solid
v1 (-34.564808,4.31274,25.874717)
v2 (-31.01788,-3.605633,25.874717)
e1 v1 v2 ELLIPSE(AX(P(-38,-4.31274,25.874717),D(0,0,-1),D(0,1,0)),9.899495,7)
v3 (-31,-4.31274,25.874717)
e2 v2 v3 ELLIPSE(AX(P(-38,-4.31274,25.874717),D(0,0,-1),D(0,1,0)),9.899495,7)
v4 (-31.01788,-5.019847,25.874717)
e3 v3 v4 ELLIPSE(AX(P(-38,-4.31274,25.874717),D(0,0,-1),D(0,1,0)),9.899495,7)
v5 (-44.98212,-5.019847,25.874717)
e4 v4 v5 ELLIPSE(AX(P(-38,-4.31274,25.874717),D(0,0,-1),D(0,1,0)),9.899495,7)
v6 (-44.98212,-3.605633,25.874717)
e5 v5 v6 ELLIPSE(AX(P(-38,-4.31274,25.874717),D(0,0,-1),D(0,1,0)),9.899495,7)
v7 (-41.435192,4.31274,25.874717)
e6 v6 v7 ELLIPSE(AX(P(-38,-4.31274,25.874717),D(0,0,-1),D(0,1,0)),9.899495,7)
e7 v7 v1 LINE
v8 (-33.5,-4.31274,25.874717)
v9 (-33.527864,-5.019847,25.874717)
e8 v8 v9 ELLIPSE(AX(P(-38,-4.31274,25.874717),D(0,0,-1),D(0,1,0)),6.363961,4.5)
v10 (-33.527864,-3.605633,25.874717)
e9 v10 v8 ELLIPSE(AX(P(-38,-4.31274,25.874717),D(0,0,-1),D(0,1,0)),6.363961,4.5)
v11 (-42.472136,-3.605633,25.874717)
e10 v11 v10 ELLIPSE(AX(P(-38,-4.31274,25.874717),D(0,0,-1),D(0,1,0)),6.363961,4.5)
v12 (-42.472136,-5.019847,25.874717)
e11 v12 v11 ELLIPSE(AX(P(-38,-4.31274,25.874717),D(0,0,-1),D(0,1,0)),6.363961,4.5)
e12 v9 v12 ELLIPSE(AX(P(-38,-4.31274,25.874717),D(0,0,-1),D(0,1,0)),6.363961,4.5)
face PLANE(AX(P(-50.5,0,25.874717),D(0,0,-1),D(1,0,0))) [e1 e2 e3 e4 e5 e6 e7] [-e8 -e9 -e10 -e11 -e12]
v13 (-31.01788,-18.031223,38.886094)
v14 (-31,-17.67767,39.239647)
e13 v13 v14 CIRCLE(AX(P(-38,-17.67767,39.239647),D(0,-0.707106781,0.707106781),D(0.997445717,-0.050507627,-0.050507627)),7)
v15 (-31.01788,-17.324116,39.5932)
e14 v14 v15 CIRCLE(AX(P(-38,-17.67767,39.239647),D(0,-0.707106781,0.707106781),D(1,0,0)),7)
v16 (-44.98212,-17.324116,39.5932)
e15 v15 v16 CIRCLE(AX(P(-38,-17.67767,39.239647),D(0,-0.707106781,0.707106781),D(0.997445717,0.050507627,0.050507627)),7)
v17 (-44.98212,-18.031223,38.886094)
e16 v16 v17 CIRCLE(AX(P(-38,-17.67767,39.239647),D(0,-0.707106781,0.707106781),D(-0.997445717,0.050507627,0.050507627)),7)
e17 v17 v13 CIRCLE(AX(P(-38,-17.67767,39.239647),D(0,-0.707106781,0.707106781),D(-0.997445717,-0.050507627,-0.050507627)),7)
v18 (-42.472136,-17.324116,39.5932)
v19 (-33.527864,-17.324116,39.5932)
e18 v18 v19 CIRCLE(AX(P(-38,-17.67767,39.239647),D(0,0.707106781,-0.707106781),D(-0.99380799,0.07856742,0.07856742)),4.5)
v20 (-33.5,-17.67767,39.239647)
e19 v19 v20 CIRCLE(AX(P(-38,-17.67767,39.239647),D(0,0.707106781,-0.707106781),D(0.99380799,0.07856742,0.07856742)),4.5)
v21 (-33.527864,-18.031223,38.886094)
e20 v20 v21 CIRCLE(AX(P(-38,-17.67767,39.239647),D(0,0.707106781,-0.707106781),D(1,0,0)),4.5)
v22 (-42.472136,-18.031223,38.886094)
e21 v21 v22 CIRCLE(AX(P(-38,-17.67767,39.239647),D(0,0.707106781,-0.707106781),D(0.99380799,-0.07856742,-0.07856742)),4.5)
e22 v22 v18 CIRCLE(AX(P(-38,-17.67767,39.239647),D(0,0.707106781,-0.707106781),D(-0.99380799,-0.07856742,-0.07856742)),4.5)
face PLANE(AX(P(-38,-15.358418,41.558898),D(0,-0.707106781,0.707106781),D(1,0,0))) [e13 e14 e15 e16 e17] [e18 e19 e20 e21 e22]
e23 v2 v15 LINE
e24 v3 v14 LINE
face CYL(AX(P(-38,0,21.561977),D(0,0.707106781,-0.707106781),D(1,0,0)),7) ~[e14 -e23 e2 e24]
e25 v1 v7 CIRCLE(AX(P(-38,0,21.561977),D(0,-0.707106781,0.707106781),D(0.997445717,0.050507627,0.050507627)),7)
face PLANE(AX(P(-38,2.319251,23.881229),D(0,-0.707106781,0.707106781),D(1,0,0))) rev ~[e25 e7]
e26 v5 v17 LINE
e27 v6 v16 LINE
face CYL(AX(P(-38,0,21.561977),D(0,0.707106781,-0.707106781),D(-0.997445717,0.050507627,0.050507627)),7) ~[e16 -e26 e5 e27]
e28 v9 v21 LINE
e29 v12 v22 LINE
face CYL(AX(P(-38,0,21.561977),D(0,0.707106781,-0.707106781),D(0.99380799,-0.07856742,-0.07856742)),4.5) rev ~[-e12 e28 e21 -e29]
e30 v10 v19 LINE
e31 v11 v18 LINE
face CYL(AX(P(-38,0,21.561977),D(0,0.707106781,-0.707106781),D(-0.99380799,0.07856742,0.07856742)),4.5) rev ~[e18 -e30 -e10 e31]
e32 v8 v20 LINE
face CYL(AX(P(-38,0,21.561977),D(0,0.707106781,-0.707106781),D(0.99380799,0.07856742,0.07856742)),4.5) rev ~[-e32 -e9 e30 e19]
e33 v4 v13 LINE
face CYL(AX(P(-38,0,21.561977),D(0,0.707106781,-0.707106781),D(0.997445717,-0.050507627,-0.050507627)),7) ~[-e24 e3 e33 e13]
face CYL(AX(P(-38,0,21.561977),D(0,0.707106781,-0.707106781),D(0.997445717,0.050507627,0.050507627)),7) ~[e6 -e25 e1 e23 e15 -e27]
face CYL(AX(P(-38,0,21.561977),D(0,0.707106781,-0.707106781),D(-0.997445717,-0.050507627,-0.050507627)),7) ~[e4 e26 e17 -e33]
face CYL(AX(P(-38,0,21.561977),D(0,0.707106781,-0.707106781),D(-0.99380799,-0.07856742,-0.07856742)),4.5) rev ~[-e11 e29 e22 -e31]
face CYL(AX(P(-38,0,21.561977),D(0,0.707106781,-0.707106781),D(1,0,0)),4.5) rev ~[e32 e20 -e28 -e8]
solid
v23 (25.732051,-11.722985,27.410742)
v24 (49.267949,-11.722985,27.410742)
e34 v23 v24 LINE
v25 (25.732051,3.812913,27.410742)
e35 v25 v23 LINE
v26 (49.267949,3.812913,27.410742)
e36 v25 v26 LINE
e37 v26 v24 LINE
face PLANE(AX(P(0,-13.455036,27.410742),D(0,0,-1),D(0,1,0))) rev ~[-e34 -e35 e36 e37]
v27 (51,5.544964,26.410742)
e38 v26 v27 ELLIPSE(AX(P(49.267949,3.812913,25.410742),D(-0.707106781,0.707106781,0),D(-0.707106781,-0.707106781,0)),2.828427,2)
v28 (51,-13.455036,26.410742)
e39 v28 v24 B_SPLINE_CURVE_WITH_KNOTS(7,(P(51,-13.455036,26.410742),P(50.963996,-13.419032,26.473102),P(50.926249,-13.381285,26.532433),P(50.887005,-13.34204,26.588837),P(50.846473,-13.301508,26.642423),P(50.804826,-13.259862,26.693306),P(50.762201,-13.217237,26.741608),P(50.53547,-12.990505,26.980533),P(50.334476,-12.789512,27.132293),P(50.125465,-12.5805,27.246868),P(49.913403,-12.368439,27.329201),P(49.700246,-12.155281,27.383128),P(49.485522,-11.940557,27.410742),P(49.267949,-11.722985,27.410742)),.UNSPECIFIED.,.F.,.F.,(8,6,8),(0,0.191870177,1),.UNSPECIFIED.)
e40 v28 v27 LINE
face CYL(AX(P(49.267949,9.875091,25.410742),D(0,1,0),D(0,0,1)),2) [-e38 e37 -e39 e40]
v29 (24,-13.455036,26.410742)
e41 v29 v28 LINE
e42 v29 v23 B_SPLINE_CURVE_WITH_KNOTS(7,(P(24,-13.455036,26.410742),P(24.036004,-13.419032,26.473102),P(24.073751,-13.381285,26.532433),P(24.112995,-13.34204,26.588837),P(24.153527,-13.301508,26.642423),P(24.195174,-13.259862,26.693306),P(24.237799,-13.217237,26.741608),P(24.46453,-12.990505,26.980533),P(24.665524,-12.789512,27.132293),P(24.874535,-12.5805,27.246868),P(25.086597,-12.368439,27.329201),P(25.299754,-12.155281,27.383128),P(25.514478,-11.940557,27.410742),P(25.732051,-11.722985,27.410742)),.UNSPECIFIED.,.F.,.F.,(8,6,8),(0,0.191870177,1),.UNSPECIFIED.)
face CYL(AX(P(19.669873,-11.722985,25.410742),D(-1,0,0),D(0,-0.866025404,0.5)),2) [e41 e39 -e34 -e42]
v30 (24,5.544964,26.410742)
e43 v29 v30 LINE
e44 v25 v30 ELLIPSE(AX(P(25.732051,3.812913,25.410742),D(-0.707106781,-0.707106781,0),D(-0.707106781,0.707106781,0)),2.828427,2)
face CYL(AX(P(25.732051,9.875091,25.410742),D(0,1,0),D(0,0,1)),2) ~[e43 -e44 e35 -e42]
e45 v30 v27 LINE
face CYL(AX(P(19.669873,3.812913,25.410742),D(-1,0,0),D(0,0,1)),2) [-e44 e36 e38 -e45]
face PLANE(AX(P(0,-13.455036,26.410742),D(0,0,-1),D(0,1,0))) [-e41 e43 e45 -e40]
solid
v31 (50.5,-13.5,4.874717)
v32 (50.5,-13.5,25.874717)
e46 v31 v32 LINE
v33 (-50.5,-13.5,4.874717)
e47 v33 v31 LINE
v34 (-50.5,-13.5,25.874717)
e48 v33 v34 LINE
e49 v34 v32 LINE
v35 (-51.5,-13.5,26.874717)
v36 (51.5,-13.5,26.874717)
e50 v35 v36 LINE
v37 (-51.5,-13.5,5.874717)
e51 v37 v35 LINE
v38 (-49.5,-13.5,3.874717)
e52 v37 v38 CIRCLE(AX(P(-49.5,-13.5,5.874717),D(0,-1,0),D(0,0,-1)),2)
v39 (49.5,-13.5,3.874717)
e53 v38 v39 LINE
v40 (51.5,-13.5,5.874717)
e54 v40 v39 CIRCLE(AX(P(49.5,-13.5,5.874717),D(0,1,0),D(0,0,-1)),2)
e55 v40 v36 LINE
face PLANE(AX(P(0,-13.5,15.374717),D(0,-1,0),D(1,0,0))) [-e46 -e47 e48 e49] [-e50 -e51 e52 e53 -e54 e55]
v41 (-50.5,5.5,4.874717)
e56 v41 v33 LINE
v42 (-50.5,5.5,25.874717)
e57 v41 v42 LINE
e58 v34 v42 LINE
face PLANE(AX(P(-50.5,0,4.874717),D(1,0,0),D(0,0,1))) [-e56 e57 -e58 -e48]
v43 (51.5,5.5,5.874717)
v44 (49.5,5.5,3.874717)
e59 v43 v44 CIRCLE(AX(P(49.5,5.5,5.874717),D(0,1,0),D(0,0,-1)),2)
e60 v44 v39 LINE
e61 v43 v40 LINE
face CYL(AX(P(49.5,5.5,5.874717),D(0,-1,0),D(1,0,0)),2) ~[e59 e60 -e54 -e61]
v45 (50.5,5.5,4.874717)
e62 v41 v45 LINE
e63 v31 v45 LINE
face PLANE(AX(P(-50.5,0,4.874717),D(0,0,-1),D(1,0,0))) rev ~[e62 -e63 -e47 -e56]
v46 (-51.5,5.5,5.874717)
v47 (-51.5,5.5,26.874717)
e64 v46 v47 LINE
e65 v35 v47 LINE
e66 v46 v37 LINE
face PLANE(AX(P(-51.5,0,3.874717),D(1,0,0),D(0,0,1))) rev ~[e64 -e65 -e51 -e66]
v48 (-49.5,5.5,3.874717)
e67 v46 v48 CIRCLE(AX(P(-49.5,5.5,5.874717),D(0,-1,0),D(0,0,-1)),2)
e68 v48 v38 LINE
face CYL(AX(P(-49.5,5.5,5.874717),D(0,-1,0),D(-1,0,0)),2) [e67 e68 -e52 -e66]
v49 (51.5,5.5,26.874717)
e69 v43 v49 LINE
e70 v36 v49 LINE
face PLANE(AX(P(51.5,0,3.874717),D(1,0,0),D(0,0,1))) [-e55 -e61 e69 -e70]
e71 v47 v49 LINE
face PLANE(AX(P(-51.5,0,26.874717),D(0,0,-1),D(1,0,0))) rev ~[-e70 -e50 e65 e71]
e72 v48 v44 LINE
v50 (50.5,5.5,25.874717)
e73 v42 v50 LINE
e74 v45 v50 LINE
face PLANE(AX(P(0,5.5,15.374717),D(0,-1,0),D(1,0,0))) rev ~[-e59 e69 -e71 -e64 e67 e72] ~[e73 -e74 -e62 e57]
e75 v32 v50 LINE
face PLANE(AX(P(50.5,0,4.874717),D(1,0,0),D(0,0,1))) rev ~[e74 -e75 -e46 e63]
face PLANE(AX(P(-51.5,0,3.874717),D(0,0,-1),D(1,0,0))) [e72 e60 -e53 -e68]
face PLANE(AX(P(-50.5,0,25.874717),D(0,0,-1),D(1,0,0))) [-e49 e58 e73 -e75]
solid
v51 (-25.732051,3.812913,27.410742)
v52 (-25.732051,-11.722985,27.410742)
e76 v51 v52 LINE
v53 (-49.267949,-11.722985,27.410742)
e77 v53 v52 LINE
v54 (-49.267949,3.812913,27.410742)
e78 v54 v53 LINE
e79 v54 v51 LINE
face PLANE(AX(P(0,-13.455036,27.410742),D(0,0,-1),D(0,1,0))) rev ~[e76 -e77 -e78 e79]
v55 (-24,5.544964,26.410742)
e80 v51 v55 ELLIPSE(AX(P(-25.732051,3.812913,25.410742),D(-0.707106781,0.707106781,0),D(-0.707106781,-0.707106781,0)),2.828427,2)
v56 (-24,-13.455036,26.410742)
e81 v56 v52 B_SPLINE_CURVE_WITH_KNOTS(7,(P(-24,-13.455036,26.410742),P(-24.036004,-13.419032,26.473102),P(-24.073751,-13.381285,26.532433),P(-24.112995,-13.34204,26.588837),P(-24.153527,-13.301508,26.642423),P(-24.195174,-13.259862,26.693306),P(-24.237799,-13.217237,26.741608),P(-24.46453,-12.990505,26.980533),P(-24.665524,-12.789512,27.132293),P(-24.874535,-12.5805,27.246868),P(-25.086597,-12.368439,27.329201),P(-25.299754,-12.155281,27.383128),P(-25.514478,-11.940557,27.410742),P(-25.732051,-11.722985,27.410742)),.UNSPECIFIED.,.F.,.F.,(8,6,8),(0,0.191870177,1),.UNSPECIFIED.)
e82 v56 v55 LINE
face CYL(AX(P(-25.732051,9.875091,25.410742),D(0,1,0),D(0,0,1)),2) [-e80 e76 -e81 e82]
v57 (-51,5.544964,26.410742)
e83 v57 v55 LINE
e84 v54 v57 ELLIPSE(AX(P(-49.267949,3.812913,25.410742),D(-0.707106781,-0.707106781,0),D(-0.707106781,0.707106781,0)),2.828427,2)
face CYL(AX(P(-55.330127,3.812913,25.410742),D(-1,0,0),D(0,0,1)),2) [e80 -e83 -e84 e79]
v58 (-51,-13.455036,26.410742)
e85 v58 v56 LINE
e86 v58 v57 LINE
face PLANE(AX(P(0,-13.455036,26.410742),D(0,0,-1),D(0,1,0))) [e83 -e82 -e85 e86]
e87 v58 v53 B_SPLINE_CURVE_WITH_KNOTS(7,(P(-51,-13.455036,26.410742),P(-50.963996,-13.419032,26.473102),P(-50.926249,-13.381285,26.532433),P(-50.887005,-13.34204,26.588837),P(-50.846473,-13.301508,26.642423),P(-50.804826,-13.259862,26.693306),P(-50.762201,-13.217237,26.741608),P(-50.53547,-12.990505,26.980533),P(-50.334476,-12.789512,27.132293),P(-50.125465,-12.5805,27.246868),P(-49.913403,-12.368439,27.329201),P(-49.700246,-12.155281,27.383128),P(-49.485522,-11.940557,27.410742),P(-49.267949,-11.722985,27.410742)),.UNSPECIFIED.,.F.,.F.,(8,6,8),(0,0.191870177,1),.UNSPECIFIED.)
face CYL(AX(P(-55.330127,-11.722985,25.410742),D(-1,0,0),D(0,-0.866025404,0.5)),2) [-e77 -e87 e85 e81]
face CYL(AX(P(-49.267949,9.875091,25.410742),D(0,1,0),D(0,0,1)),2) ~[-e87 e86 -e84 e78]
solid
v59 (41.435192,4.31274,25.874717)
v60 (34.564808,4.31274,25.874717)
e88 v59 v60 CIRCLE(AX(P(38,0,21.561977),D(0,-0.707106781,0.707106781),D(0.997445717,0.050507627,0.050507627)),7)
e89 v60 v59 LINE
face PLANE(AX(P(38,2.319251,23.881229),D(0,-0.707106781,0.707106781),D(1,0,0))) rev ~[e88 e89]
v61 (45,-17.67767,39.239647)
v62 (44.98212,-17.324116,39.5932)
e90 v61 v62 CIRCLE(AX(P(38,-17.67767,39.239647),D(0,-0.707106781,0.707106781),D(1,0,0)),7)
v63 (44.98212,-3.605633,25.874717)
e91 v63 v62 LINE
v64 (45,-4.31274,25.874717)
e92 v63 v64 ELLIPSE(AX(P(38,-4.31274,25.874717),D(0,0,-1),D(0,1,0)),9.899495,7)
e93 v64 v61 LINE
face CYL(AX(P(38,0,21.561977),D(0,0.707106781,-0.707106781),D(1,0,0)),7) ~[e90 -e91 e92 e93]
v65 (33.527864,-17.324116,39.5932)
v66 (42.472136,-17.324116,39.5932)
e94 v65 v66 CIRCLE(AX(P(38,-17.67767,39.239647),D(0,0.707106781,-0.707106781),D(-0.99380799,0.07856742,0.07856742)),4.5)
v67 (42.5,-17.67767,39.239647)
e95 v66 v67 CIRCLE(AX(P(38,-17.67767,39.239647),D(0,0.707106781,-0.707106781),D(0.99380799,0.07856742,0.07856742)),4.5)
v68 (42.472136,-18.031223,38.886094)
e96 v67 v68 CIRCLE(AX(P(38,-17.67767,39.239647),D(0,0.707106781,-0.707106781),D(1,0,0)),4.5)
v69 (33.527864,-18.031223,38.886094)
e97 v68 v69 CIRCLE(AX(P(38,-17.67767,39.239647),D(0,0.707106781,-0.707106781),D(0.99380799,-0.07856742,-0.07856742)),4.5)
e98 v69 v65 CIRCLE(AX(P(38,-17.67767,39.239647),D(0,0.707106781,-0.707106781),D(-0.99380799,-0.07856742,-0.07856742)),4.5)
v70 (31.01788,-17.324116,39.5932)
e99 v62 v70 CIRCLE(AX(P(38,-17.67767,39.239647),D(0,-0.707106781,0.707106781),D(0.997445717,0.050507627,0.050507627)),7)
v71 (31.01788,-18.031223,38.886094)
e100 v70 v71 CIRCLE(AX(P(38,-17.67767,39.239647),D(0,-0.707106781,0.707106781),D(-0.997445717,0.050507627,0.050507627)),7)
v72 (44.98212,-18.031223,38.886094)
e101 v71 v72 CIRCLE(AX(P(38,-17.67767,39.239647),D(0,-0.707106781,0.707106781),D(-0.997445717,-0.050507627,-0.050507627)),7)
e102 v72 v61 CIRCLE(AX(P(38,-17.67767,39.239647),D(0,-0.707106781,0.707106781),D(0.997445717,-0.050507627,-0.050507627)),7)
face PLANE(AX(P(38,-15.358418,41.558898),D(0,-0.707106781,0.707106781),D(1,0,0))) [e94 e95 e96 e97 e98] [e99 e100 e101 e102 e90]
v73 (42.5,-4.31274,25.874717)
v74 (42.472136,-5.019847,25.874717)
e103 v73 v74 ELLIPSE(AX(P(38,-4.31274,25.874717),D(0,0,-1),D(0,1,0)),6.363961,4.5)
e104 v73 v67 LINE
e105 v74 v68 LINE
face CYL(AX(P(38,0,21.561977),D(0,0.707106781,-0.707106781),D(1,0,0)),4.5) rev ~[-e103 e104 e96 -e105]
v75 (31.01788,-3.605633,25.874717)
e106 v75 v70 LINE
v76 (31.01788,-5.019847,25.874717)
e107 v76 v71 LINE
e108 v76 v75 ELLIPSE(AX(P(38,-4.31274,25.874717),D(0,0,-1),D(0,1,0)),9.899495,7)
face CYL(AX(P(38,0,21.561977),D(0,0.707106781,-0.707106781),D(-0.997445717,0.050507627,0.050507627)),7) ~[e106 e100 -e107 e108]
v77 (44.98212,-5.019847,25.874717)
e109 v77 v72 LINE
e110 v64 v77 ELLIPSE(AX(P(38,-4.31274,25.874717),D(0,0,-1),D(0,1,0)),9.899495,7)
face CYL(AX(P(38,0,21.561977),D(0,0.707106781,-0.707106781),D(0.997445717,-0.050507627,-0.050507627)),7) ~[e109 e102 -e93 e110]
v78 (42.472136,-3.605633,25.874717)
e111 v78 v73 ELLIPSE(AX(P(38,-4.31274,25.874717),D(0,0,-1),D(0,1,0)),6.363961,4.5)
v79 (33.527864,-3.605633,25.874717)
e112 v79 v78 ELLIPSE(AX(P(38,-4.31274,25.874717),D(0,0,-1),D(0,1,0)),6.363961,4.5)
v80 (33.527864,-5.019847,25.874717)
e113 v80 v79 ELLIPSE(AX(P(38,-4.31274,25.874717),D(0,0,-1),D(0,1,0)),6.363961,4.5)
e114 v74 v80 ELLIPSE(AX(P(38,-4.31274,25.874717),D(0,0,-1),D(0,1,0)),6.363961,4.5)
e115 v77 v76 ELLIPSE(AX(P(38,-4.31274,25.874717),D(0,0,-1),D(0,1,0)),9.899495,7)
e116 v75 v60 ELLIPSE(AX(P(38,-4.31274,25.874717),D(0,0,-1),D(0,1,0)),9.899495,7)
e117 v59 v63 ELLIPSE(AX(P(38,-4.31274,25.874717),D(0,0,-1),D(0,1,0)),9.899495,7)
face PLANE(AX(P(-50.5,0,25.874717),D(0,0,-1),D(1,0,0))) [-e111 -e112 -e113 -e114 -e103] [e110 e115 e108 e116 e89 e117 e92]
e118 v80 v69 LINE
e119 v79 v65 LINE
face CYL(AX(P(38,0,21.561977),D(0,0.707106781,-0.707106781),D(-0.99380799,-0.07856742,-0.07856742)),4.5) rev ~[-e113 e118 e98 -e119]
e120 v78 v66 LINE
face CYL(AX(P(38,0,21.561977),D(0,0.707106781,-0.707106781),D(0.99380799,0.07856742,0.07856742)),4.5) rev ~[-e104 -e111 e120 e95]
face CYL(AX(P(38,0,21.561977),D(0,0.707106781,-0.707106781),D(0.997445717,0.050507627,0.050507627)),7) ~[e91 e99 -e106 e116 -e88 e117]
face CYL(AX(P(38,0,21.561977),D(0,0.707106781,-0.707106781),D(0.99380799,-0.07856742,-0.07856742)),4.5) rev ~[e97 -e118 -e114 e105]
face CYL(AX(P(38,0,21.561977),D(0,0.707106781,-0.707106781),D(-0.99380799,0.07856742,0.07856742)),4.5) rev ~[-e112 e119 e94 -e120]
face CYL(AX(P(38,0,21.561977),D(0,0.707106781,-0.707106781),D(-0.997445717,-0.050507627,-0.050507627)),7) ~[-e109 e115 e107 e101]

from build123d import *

# Parameters (mm, degrees)
F1_DEPTH       = 25
F2_ANGLE       = 45
F3_W           = 19
F3_H           = 1
F4_DEPTH       = 51
F4_DEPTH_BACK  = 51
F5_DEPTH       = 24
F5_DEPTH_BACK  = 24
F6_W           = 103
F6_H           = 23
F6_W_2         = 101
F6_H_2         = 21
F7_DEPTH       = 13.5
F7_DEPTH_BACK  = 5.5
F8_DEPTH       = 25
F8_DEPTH_BACK  = 25
F9_T1_DEPTH    = 35.6602540378
F9_T3_DEPTH    = 27.6602540378
F9_S1_T1_DEPTH = 35.6602540378
F9_S1_T3_DEPTH = 27.6602540378
F10_R          = 2


# Not quite as in the source:
# - a fillet or chamfer that OpenCascade refuses, or shapes differently, is made with other operations: its cross-section is extruded or revolved along the edge and cut away or added


with BuildPart() as f1:
    # F0 (on Front) → F1 (new body)
    with BuildSketch(Plane.XZ):
        with BuildLine():
            Line((-33.527864045, 22.0619773716), (-31.0178799781, 22.0619773716))
            ThreePointArc((-31.0178799781, 22.0619773716), (-38, 28.5619773716), (-44.9821200219, 22.0619773716))
            Line((-44.9821200219, 22.0619773716), (-42.472135955, 22.0619773716))
            ThreePointArc((-42.472135955, 22.0619773716), (-38, 26.0619773716), (-33.527864045, 22.0619773716))
        make_face()
        with BuildLine():
            Line((-42.472135955, 22.0619773716), (-44.9821200219, 22.0619773716))
            ThreePointArc((-44.9821200219, 22.0619773716), (-45, 21.5619773716), (-44.9821200219, 21.0619773716))
            Line((-44.9821200219, 21.0619773716), (-42.472135955, 21.0619773716))
            ThreePointArc((-42.472135955, 21.0619773716), (-42.5, 21.5619773716), (-42.472135955, 22.0619773716))
        make_face()
        with BuildLine():
            ThreePointArc((-44.9821200219, 21.0619773716), (-38, 14.5619773716), (-31.0178799781, 21.0619773716))
            Line((-31.0178799781, 21.0619773716), (-33.527864045, 21.0619773716))
            ThreePointArc((-33.527864045, 21.0619773716), (-38, 17.0619773716), (-42.472135955, 21.0619773716))
            Line((-42.472135955, 21.0619773716), (-44.9821200219, 21.0619773716))
        make_face()
        with BuildLine():
            ThreePointArc((-31.0178799781, 21.0619773716), (-31.0044714226, 21.3118175758), (-31, 21.5619773716))
            ThreePointArc((-31, 21.5619773716), (-31.0044714226, 21.8121371673), (-31.0178799781, 22.0619773716))
            Line((-31.0178799781, 22.0619773716), (-33.527864045, 22.0619773716))
            ThreePointArc((-33.527864045, 22.0619773716), (-33.5069714113, 21.8123652731), (-33.5, 21.5619773716))
            ThreePointArc((-33.5, 21.5619773716), (-33.5069714113, 21.31158947), (-33.527864045, 21.0619773716))
            Line((-33.527864045, 21.0619773716), (-31.0178799781, 21.0619773716))
        make_face()
    extrude(amount=F1_DEPTH)


with BuildPart() as f1b:
    # F0 (on Front) → F1, piece 2 (new body)
    with BuildSketch(Plane.XZ):
        with BuildLine():
            ThreePointArc((44.9821200219, 22.0619773716), (38, 28.5619773716), (31.0178799781, 22.0619773716))
            Line((31.0178799781, 22.0619773716), (33.527864045, 22.0619773716))
            ThreePointArc((33.527864045, 22.0619773716), (38, 26.0619773716), (42.472135955, 22.0619773716))
            Line((42.472135955, 22.0619773716), (44.9821200219, 22.0619773716))
        make_face()
        with BuildLine():
            Line((33.527864045, 22.0619773716), (31.0178799781, 22.0619773716))
            ThreePointArc((31.0178799781, 22.0619773716), (31, 21.5619773716), (31.0178799781, 21.0619773716))
            Line((31.0178799781, 21.0619773716), (33.527864045, 21.0619773716))
            ThreePointArc((33.527864045, 21.0619773716), (33.5, 21.5619773716), (33.527864045, 22.0619773716))
        make_face()
        with BuildLine():
            Line((33.527864045, 21.0619773716), (31.0178799781, 21.0619773716))
            ThreePointArc((31.0178799781, 21.0619773716), (38, 14.5619773716), (44.9821200219, 21.0619773716))
            Line((44.9821200219, 21.0619773716), (42.472135955, 21.0619773716))
            ThreePointArc((42.472135955, 21.0619773716), (38, 17.0619773716), (33.527864045, 21.0619773716))
        make_face()
        with BuildLine():
            ThreePointArc((45, 21.5619773716), (44.9955285774, 21.8121371673), (44.9821200219, 22.0619773716))
            Line((44.9821200219, 22.0619773716), (42.472135955, 22.0619773716))
            ThreePointArc((42.472135955, 22.0619773716), (42.4930285887, 21.8123652731), (42.5, 21.5619773716))
            ThreePointArc((42.5, 21.5619773716), (42.4930285887, 21.31158947), (42.472135955, 21.0619773716))
            Line((42.472135955, 21.0619773716), (44.9821200219, 21.0619773716))
            ThreePointArc((44.9821200219, 21.0619773716), (44.9955285774, 21.3118175758), (45, 21.5619773716))
        make_face()
    extrude(amount=F1_DEPTH)


with BuildPart() as f1_1:
    # F2: moved
    add(f1.part.rotate(Axis((25, 0, 21.5619773716), (-1, 0, 0)), F2_ANGLE))


with BuildPart() as f1b_1:
    # F2: moved
    add(f1b.part.rotate(Axis((25, 0, 21.5619773716), (-1, 0, 0)), F2_ANGLE))


with BuildPart() as f4:
    # F3 (on Right) → F4 (new body, two sides)
    with BuildSketch(Plane.YZ) as f4_sk:
        with Locations((-3.955035704, 26.910741644)):
            Rectangle(F3_W, F3_H)
    extrude(amount=F4_DEPTH)
    extrude(f4_sk.sketch, amount=-F4_DEPTH_BACK)

    # F3 (on Right) → F5 (cut, two sides)
    with BuildSketch(Plane.YZ) as f5_sk:
        with Locations((-3.955035704, 26.910741644)):
            Rectangle(F3_W, F3_H)
    extrude(amount=-F5_DEPTH, mode=Mode.SUBTRACT)
    extrude(f5_sk.sketch, amount=F5_DEPTH_BACK, mode=Mode.SUBTRACT)

    # F9: fillet of radius 2 on 4 edges, made by hand

    # F9_s2 → F9_t1 (cut)
    with BuildSketch(Plane.YZ.offset(19.6698729811)):
        with BuildLine():
            ThreePointArc((3.8129134884, 27.410741644), (4.8129134884, 27.1427924515), (5.544964296, 26.410741644))
            Line((5.544964296, 26.410741644), (5.544964296, 27.410741644))
            Line((5.544964296, 27.410741644), (3.8129134884, 27.410741644))
        make_face()
        with BuildLine():
            ThreePointArc((-13.455035704, 26.410741644), (-12.7229848965, 27.1427924515), (-11.7229848965, 27.410741644))
            Line((-11.7229848965, 27.410741644), (-13.455035704, 27.410741644))
            Line((-13.455035704, 27.410741644), (-13.455035704, 26.410741644))
        make_face()
    extrude(amount=F9_T1_DEPTH, mode=Mode.SUBTRACT)

    # F9_s4 → F9_t3 (cut)
    with BuildSketch(Plane.XZ.offset(-9.8750913149)):
        with BuildLine():
            ThreePointArc((25.7320508076, 27.410741644), (24.7320508076, 27.1427924515), (24, 26.410741644))
            Line((24, 26.410741644), (24, 27.410741644))
            Line((24, 27.410741644), (25.7320508076, 27.410741644))
        make_face()
        with BuildLine():
            ThreePointArc((49.2679491924, 27.410741644), (50.2679491924, 27.1427924515), (51, 26.410741644))
            Line((51, 26.410741644), (51, 27.410741644))
            Line((51, 27.410741644), (49.2679491924, 27.410741644))
        make_face()
    extrude(amount=F9_T3_DEPTH, mode=Mode.SUBTRACT)

    # F9#s1: fillet of radius 2 on 4 edges, made by hand

    # F9_s1_s2 → F9_s1_t1 (cut)
    with BuildSketch(Plane.YZ.offset(-55.3301270189)):
        with BuildLine():
            ThreePointArc((3.8129134884, 27.410741644), (4.8129134884, 27.1427924515), (5.544964296, 26.410741644))
            Line((5.544964296, 26.410741644), (5.5796053121, 26.430741644))
            ThreePointArc((5.5796053121, 26.430741644), (5.584964296, 26.910741644), (5.584964296, 27.410741644))
            Line((5.584964296, 27.410741644), (5.544964296, 27.450741644))
            Line((5.544964296, 27.450741644), (3.8129134884, 27.450741644))
            Line((3.8129134884, 27.450741644), (3.8129134884, 27.410741644))
        make_face()
        with BuildLine():
            ThreePointArc((-13.455035704, 26.410741644), (-12.7229848965, 27.1427924515), (-11.7229848965, 27.410741644))
            Line((-11.7229848965, 27.410741644), (-11.7229848965, 27.450741644))
            Line((-11.7229848965, 27.450741644), (-13.455035704, 27.450741644))
            Line((-13.455035704, 27.450741644), (-13.495035704, 27.410741644))
            ThreePointArc((-13.495035704, 27.410741644), (-13.495035704, 26.910741644), (-13.4896767202, 26.430741644))
            Line((-13.4896767202, 26.430741644), (-13.455035704, 26.410741644))
        make_face()
    extrude(amount=F9_S1_T1_DEPTH, mode=Mode.SUBTRACT)

    # F9_s1_s4 → F9_s1_t3 (cut)
    with BuildSketch(Plane.XZ.offset(-9.8750913149)):
        with BuildLine():
            ThreePointArc((-49.2679491924, 27.410741644), (-50.2679491924, 27.1427924515), (-51, 26.410741644))
            Line((-51, 26.410741644), (-51.0346410162, 26.430741644))
            ThreePointArc((-51.0346410162, 26.430741644), (-51.04, 26.910741644), (-51.04, 27.410741644))
            Line((-51.04, 27.410741644), (-51, 27.450741644))
            Line((-51, 27.450741644), (-49.2679491924, 27.450741644))
            Line((-49.2679491924, 27.450741644), (-49.2679491924, 27.410741644))
        make_face()
        with BuildLine():
            ThreePointArc((-25.7320508076, 27.410741644), (-24.7320508076, 27.1427924515), (-24, 26.410741644))
            Line((-24, 26.410741644), (-23.9653589838, 26.430741644))
            ThreePointArc((-23.9653589838, 26.430741644), (-23.96, 26.910741644), (-23.96, 27.410741644))
            Line((-23.96, 27.410741644), (-24, 27.450741644))
            Line((-24, 27.450741644), (-25.7320508076, 27.450741644))
            Line((-25.7320508076, 27.450741644), (-25.7320508076, 27.410741644))
        make_face()
    extrude(amount=F9_S1_T3_DEPTH, mode=Mode.SUBTRACT)


with BuildPart() as f7:
    # F6 (on Front) → F7 (new body, two sides)
    with BuildSketch(Plane.XZ) as f7_sk:
        with Locations((0, 15.3747174848)):
            Rectangle(F6_W, F6_H)
        with Locations((0, 15.3747174848)):
            Rectangle(F6_W_2, F6_H_2, mode=Mode.SUBTRACT)
    extrude(amount=F7_DEPTH)
    extrude(f7_sk.sketch, amount=-F7_DEPTH_BACK)

    # F10
    f10_edges = [f7.edges().sort_by_distance(p)[0] for p in [
        (51.5, -4, 3.874717),
        (-51.5, -4, 3.874717),
    ]]
    fillet(f10_edges, radius=F10_R)


with BuildPart() as f8_tool:
    # F6 (on Front) → F8 (new body, two sides)
    with BuildSketch(Plane.XZ) as f8_sk:
        with Locations((0, 15.3747174848)):
            Rectangle(F6_W_2, F6_H_2)
    extrude(amount=F8_DEPTH)
    extrude(f8_sk.sketch, amount=-F8_DEPTH_BACK)


with BuildPart() as f1_2:
    add(f1_1.part)

    # F8: cut by f8_tool
    add(f8_tool.part, mode=Mode.SUBTRACT)


with BuildPart() as f1b_2:
    add(f1b_1.part)

    # F8: cut by f8_tool
    add(f8_tool.part, mode=Mode.SUBTRACT)


solid = Compound([f4.part, f7.part, f1_2.part, f1b_2.part])
